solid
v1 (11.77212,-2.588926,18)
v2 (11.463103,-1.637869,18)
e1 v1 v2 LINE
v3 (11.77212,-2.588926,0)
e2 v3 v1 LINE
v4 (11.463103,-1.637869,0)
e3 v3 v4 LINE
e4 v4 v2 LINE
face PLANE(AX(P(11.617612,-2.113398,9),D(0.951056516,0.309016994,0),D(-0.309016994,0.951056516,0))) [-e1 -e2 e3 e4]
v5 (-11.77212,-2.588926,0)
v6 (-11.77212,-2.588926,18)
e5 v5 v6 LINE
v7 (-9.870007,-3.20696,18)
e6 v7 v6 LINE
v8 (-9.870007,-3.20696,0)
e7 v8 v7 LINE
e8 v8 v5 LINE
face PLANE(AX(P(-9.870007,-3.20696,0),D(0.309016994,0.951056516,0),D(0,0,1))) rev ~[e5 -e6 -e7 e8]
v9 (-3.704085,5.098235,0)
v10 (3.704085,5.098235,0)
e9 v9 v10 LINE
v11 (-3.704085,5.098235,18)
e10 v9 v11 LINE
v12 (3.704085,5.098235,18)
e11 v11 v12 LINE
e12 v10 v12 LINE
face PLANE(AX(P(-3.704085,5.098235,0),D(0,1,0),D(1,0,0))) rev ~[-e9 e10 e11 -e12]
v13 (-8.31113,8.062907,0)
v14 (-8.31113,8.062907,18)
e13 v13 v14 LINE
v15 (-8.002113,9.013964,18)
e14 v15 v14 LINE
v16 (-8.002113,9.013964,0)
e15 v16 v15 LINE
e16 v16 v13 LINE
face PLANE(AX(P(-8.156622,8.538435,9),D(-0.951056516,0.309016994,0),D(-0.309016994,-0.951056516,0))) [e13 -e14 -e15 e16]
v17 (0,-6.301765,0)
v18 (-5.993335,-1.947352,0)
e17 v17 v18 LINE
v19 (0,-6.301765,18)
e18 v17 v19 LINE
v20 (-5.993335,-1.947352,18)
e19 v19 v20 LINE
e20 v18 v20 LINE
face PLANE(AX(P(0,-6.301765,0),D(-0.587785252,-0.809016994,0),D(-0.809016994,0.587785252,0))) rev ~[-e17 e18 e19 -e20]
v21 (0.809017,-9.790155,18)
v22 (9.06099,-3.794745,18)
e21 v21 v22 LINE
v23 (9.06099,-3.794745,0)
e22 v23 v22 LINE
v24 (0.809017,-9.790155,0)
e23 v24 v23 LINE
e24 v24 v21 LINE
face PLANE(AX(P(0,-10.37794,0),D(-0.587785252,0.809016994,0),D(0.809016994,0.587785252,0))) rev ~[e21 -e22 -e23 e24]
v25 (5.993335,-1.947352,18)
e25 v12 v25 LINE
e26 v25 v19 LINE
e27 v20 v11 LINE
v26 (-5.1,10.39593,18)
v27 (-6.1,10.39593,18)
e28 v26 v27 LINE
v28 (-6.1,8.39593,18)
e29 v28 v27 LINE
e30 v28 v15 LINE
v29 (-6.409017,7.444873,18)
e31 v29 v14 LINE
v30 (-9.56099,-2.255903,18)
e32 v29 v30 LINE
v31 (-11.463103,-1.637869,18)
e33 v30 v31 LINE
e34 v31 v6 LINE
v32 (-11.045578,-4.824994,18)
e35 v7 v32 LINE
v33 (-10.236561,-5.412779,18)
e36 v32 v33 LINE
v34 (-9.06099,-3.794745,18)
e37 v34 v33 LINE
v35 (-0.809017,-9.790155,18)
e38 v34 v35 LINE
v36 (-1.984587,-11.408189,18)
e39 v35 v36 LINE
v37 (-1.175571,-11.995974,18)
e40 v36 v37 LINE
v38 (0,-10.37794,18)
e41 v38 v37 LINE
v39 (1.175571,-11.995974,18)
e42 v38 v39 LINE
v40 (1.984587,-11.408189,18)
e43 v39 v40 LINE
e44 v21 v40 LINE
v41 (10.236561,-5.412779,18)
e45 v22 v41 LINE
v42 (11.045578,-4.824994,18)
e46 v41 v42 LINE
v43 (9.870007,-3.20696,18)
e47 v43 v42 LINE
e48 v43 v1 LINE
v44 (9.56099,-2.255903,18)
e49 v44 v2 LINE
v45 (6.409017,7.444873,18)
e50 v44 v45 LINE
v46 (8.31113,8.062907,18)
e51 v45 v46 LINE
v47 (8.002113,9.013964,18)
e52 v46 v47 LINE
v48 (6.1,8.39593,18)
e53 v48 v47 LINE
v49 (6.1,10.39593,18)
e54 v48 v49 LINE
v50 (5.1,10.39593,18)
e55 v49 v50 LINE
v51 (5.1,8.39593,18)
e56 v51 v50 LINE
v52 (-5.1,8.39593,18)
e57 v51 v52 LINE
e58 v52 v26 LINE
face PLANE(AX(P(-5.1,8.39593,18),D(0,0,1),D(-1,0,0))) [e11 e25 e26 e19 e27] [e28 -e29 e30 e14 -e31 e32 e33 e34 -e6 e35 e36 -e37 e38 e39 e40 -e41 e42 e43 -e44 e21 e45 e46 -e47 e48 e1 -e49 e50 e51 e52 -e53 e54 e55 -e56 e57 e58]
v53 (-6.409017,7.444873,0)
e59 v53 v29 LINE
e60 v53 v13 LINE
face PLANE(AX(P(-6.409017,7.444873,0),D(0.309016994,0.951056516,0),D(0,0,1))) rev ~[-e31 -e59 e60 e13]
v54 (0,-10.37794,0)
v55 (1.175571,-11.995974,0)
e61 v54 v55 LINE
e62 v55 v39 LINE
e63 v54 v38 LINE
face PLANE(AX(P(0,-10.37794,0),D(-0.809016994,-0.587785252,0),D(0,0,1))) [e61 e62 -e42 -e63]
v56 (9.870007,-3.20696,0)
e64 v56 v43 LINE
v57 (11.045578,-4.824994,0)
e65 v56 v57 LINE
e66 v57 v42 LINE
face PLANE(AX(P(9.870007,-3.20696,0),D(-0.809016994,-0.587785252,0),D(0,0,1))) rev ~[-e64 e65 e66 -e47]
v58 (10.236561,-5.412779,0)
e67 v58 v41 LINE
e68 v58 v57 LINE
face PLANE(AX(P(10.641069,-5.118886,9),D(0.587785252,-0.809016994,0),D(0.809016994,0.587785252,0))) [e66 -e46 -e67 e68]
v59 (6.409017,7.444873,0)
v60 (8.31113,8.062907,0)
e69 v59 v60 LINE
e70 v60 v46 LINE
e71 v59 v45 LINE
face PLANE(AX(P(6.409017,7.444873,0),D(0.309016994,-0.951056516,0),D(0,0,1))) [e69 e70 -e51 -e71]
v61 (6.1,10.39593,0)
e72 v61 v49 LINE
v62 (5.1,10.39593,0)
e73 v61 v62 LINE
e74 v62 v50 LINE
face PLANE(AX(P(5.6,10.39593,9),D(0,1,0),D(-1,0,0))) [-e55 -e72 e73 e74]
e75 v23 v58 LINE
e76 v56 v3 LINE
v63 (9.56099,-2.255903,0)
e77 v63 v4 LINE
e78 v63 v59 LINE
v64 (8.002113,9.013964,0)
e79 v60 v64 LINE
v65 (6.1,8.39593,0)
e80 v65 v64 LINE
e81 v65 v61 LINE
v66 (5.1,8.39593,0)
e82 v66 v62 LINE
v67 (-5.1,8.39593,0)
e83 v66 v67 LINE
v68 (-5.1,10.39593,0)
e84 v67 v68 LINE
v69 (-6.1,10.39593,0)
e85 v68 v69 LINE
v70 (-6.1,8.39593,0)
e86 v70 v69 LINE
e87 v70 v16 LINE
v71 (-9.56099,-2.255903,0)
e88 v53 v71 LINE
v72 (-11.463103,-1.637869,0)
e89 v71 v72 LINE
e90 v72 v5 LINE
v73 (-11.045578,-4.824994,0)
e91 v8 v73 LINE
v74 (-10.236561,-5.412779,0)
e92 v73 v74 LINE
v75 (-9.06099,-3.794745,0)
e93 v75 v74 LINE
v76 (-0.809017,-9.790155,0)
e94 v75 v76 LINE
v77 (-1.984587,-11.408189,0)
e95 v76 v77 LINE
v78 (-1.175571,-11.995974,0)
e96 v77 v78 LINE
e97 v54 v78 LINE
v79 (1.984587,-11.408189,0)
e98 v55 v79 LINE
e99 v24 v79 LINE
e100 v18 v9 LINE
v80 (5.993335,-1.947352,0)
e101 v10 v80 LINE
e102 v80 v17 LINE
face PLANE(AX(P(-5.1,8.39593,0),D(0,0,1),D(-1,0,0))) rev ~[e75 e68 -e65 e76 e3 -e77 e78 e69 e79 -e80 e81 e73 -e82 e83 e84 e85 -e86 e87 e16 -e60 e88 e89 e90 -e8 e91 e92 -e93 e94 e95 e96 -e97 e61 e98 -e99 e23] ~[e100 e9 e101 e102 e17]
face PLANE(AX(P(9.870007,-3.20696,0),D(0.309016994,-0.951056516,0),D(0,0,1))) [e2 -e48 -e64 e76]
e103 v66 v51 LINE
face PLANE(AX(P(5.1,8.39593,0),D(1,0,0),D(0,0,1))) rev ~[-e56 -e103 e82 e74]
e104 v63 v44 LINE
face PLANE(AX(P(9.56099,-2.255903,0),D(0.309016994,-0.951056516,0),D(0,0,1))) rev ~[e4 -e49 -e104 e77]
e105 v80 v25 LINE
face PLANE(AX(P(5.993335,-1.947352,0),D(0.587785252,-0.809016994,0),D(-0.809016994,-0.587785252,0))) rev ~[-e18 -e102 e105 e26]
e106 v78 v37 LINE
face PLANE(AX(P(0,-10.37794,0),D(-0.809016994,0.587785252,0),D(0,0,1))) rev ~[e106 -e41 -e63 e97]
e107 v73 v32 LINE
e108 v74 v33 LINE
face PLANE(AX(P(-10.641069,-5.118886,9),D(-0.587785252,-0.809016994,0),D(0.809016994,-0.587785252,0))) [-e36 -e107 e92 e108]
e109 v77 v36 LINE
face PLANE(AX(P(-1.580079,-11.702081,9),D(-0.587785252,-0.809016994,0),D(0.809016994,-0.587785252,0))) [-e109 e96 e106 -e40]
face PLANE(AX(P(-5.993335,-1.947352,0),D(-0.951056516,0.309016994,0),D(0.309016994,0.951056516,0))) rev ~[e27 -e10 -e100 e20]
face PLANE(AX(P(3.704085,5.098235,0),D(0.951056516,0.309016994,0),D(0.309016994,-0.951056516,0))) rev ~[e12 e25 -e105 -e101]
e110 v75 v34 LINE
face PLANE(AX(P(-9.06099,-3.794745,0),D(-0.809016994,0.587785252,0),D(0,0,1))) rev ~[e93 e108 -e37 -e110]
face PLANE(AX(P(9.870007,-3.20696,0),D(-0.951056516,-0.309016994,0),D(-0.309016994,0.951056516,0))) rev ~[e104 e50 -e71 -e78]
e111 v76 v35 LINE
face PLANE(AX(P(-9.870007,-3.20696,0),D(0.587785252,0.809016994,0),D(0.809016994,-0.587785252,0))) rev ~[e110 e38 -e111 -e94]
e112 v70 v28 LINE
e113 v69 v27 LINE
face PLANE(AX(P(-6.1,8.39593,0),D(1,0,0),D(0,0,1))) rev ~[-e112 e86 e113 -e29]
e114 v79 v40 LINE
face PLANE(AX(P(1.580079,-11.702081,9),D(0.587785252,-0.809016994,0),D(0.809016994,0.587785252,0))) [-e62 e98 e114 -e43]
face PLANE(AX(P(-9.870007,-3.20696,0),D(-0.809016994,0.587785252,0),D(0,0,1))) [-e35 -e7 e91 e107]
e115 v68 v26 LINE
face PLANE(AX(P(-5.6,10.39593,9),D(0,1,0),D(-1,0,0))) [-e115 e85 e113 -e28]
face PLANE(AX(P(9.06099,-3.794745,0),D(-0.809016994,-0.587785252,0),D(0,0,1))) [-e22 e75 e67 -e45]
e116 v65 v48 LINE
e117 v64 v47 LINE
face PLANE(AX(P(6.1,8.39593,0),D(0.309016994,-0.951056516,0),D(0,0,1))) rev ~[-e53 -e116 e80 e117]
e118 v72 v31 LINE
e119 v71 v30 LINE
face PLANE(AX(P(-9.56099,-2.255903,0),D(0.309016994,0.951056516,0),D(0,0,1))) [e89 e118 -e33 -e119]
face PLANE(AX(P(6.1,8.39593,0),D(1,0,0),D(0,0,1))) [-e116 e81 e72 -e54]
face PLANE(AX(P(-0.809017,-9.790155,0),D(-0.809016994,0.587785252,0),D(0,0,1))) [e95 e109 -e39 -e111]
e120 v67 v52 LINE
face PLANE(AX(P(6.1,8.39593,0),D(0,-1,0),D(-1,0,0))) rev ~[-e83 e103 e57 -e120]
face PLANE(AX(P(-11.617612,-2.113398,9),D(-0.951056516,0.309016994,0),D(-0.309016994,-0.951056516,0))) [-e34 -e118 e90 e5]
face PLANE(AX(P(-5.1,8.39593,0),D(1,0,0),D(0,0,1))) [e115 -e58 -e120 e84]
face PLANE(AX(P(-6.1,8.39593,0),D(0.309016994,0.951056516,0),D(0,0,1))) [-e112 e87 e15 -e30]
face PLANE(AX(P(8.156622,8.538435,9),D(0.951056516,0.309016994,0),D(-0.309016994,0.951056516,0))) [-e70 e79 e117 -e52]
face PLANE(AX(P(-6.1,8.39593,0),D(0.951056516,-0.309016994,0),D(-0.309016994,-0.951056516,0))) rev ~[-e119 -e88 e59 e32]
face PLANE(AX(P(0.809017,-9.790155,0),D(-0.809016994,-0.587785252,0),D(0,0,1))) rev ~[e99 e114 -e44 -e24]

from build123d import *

# Parameters (mm, degrees)
F1_DEPTH  = 18
F2_W      = 1
F2_H      = 18
F3_DEPTH  = 2
F4_W      = 1
F4_H      = 18
F5_DEPTH  = 2
F6_W      = 1
F6_H      = 18
F7_DEPTH  = 2
F8_W      = 1
F8_H      = 18
F9_DEPTH  = 2
F10_W     = 1
F10_H     = 18
F11_DEPTH = 2


with BuildPart() as f1:
    # F0 (on Top) → F1 (new body)
    with BuildSketch(Plane.XY):
        Polygon((0, -10.3779398619), (9.8700073314, -3.2069597839), (6.1, 8.3959297149), (-6.1, 8.3959297149), (-9.8700073314, -3.2069597839), align=None)
        Polygon((-5.9933346782, -1.947352483), (-3.7040845371, 5.0982349887), (3.7040845371, 5.0982349887), (5.9933346782, -1.947352483), (0, -6.3017650113), align=None, mode=Mode.SUBTRACT)
    extrude(amount=F1_DEPTH)

    # F2 (on face) → F3 (join)
    with BuildSketch(Plane(origin=(4.9350036657, -6.7924498229, 0), x_dir=(0.8090169944, 0.5877852523, 0), z_dir=(0.5877852523, -0.8090169944, 0))):
        with Locations((-5.6, 9)):
            Rectangle(F2_W, F2_H)
        with Locations((5.6, 9)):
            Rectangle(F2_W, F2_H)
    extrude(amount=F3_DEPTH)

    # F4 (on face) → F5 (join)
    with BuildSketch(Plane(origin=(-4.9350036657, -6.7924498229, 0), x_dir=(0.8090169944, -0.5877852523, 0), z_dir=(-0.5877852523, -0.8090169944, 0))):
        with Locations((5.6, 9)):
            Rectangle(F4_W, F4_H)
        with Locations((-5.6, 9)):
            Rectangle(F4_W, F4_H)
    extrude(amount=F5_DEPTH)

    # F6 (on face) → F7 (join)
    with BuildSketch(Plane(origin=(-7.9850036657, 2.5944849655, 0), x_dir=(-0.3090169944, -0.9510565163, 0), z_dir=(-0.9510565163, 0.3090169944, 0))):
        with Locations((5.6, 9)):
            Rectangle(F6_W, F6_H)
        with Locations((-5.6, 9)):
            Rectangle(F6_W, F6_H)
    extrude(amount=F7_DEPTH)

    # F8 (on face) → F9 (join)
    with BuildSketch(Plane(origin=(7.9850036657, 2.5944849655, 0), x_dir=(-0.3090169944, 0.9510565163, 0), z_dir=(0.9510565163, 0.3090169944, 0))):
        with Locations((-5.6, 9)):
            Rectangle(F8_W, F8_H)
        with Locations((5.6, 9)):
            Rectangle(F8_W, F8_H)
    extrude(amount=F9_DEPTH)

    # F10 (on face) → F11 (join)
    with BuildSketch(Plane(origin=(0, 8.3959297149, 0), x_dir=(-1, 0, 0), z_dir=(0, 1, 0))):
        with Locations((5.6, 9)):
            Rectangle(F10_W, F10_H)
        with Locations((-5.6, 9)):
            Rectangle(F10_W, F10_H)
    extrude(amount=F11_DEPTH)


solid = f1.part
